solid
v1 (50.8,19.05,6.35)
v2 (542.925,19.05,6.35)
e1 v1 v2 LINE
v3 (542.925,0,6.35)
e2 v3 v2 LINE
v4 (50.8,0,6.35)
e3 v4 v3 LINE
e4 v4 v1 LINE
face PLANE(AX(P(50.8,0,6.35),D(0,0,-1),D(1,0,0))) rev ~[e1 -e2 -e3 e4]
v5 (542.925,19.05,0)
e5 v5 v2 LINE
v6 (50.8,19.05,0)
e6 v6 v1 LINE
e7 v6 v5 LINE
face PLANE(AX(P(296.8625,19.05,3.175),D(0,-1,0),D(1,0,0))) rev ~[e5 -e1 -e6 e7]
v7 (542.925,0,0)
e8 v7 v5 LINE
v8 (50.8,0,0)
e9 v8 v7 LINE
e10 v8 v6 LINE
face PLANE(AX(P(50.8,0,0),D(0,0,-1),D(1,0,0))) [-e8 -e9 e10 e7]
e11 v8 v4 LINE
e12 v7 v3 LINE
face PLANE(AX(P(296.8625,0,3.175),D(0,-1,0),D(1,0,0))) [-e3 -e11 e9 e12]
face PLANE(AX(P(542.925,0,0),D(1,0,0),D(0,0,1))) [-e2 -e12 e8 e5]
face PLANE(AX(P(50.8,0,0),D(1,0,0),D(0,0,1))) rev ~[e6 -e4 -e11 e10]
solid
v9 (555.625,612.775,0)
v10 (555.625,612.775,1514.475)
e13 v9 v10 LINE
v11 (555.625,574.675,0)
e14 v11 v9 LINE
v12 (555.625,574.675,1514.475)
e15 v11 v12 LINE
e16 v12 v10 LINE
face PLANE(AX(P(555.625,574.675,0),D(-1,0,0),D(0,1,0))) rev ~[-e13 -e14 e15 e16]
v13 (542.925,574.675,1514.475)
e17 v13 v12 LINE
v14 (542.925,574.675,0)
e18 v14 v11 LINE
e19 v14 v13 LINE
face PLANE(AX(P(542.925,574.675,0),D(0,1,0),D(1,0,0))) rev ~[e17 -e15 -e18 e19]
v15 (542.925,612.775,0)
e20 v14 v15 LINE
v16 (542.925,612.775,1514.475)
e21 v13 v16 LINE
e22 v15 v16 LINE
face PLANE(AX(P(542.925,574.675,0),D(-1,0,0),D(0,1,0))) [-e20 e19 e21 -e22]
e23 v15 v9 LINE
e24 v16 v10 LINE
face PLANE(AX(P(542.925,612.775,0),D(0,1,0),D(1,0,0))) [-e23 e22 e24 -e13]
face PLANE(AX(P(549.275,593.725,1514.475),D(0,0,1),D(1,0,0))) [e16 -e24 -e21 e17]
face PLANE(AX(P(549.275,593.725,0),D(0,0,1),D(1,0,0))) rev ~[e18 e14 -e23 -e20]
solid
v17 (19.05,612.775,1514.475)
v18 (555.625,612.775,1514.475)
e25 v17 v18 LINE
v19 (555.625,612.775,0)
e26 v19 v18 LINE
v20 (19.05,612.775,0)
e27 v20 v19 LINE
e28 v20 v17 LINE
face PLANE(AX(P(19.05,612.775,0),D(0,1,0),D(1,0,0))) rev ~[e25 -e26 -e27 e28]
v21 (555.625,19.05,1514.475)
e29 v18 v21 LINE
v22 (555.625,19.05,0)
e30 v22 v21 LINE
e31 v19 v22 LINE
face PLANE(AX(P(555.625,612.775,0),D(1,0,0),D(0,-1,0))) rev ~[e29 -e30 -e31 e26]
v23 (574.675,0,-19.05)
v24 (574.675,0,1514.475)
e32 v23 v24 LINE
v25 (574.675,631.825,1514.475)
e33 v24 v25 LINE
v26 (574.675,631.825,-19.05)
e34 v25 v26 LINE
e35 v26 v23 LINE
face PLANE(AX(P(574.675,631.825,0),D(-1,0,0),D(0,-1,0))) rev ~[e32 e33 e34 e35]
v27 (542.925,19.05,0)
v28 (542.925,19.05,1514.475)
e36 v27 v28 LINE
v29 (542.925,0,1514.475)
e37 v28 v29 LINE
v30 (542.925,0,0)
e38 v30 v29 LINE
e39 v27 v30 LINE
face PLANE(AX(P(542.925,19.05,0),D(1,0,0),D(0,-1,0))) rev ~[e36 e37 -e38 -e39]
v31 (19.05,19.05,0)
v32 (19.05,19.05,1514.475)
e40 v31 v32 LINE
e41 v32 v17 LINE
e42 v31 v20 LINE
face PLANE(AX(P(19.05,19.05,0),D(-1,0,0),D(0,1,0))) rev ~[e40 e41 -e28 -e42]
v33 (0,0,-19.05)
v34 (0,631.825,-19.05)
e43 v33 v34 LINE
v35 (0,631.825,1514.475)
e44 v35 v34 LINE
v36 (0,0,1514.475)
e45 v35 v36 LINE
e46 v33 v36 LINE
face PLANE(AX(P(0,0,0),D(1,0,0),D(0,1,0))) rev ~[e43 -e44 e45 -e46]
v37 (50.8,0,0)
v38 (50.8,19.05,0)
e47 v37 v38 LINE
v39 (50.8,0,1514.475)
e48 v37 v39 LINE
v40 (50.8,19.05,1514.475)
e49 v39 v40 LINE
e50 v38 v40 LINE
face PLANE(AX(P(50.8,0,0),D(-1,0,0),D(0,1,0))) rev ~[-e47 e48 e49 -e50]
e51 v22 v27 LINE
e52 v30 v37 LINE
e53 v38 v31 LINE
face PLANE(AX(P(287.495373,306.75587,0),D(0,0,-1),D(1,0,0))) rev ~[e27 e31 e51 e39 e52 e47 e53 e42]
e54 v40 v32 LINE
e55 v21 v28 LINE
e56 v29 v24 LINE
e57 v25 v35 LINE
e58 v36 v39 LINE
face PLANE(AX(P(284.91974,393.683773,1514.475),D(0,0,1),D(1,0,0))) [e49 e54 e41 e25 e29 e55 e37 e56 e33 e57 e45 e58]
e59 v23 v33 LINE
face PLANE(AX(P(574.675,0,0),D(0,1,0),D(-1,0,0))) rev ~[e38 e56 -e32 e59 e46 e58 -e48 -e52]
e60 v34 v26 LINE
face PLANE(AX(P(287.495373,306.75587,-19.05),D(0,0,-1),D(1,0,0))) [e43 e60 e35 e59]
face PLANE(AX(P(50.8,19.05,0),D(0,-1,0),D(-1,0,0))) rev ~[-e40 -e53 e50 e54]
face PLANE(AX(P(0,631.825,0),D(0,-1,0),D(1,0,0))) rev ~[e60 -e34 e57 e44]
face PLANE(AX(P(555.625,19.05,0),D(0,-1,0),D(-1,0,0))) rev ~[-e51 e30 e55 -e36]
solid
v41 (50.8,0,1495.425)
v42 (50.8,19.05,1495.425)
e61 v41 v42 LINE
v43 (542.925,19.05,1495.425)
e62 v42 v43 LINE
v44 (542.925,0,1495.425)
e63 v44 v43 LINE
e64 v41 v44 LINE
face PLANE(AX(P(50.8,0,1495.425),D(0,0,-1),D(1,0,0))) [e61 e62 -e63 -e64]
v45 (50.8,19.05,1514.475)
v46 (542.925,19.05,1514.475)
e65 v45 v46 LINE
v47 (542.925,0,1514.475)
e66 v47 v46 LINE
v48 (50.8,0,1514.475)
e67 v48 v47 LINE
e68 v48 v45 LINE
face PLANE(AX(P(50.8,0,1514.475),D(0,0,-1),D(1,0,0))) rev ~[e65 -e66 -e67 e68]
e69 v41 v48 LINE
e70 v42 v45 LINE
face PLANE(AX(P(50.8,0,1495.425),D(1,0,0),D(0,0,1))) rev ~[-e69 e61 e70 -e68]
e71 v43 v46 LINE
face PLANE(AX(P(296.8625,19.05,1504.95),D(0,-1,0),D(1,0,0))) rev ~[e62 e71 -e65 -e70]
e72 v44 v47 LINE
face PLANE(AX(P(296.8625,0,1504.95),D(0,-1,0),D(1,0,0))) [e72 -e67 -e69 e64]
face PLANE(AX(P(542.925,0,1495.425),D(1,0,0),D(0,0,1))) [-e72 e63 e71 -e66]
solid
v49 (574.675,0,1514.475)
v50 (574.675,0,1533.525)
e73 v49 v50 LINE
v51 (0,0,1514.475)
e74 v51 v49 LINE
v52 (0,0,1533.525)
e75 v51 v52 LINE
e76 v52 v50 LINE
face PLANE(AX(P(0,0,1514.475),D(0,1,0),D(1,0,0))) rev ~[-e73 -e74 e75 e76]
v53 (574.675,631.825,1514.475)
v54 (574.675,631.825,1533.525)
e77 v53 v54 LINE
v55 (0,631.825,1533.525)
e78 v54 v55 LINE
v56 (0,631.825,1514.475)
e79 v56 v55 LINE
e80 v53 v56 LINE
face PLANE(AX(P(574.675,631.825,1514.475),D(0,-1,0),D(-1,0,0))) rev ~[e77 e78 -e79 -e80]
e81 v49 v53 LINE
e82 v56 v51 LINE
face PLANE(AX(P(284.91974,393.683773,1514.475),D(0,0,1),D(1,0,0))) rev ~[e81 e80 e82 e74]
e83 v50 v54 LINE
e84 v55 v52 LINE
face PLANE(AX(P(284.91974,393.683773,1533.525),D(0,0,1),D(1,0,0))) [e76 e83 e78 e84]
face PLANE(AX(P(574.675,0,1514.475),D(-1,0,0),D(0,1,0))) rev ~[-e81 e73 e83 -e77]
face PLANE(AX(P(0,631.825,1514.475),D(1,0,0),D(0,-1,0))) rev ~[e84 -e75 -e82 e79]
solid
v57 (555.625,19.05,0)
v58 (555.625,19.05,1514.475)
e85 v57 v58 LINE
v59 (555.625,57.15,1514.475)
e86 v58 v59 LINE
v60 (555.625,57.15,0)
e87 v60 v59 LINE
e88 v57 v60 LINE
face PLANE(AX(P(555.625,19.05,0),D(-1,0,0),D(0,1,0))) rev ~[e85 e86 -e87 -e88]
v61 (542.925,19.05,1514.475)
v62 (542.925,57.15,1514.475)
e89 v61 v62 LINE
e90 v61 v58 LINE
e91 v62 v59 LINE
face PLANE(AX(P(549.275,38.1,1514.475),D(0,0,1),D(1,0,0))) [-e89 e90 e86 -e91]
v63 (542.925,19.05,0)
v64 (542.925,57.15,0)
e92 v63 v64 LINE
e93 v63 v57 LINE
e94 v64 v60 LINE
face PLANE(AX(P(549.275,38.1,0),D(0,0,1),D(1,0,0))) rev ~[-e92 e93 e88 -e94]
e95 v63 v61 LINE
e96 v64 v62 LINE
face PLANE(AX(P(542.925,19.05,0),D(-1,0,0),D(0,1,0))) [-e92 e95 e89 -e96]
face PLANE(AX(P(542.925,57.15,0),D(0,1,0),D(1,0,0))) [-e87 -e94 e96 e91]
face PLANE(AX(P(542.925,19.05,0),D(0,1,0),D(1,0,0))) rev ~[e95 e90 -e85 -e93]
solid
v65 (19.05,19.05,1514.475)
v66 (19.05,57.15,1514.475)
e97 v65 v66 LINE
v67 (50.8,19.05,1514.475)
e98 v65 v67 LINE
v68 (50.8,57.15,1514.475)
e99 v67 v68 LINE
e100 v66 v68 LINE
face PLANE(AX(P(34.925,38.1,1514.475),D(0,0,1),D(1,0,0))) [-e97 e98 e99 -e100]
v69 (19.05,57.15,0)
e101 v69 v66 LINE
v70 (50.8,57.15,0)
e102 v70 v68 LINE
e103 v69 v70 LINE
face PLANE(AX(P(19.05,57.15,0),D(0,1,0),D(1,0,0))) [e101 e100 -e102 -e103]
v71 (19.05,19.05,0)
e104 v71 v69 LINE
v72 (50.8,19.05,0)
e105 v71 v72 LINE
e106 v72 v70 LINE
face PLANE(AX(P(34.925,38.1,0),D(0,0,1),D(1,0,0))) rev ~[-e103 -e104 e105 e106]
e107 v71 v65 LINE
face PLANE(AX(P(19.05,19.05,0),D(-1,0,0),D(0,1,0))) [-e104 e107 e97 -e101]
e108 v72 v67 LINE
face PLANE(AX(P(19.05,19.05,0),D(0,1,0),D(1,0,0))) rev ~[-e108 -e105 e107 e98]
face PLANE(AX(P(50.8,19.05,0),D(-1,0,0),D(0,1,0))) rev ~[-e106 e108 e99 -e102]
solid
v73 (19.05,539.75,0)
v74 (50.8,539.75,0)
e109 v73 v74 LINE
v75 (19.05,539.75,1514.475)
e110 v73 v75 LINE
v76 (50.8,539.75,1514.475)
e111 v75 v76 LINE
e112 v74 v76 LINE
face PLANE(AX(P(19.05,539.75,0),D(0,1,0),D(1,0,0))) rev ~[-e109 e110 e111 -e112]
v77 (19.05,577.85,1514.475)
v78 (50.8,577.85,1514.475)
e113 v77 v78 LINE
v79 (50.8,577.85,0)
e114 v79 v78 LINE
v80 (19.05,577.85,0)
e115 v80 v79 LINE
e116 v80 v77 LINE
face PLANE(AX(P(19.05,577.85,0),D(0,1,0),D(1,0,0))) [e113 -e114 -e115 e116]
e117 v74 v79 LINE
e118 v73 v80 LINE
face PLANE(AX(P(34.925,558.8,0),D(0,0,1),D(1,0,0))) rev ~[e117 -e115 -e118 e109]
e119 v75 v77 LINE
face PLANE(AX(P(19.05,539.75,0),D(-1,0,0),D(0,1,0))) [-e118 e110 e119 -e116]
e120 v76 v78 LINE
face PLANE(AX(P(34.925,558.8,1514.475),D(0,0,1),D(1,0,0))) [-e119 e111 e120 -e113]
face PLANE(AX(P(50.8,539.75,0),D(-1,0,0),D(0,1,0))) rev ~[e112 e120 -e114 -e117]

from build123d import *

# Parameters (mm, degrees)
F1_DEPTH  = 1514.475
F3_DEPTH  = 19.05
F5_DEPTH  = 19.05
F6_W      = 492.125
F6_H      = 6.35
F7_DEPTH  = 19.05
F8_W      = 492.125
F8_H      = 19.05
F9_DEPTH  = 19.05
F10_W     = 12.7
F10_H     = 38.1
F11_DEPTH = 1514.475
F10_W_2   = 31.75


# Not quite as in the source:
# - a feature names something its author has since deleted; it is built from what else it names


with BuildPart() as f1:
    # F0 (on Top) → F1 (new body)
    with BuildSketch(Plane.XY):
        Polygon((0, 631.825), (0, 0), (50.8, 0), (50.8, 19.05), (19.05, 19.05), (19.05, 612.775), (555.625, 612.775), (555.625, 19.05), (542.925, 19.05), (542.925, 0), (574.675, 0), (574.675, 631.825), align=None)
    extrude(amount=F1_DEPTH)

    # F4 (on face) → F5 (join)
    with BuildSketch(Plane(origin=(0, 0, 0), x_dir=(1, 0, 0), z_dir=(0, 0, -1))):
        Polygon((542.925, 0), (50.8, 0), (50.8, -19.05), (19.05, -19.05), (19.05, -612.775), (555.625, -612.775), (555.625, -19.05), (542.925, -19.05), align=None)
        Polygon((50.8, 0), (0, 0), (0, -631.825), (574.675, -631.825), (574.675, 0), (542.925, 0), (542.925, -19.05), (555.625, -19.05), (555.625, -612.775), (19.05, -612.775), (19.05, -19.05), (50.8, -19.05), align=None)
    extrude(amount=F5_DEPTH)


with BuildPart() as f3:
    # F2 (on face) → F3 (new body)
    with BuildSketch(Plane.XY.offset(1514.475)):
        Polygon((574.675, 631.825), (0, 631.825), (0, 0), (50.8, 0), (50.8, 19.05), (19.05, 19.05), (19.05, 612.775), (555.625, 612.775), (555.625, 19.05), (542.925, 19.05), (542.925, 0), (574.675, 0), align=None)
        Polygon((50.8, 19.05), (50.8, 0), (542.925, 0), (542.925, 19.05), (555.625, 19.05), (555.625, 612.775), (19.05, 612.775), (19.05, 19.05), align=None)
    extrude(amount=F3_DEPTH)


with BuildPart() as f7:
    # F6 (on face) → F7 (new body)
    with BuildSketch(Plane.XZ):
        with Locations((296.8625, 3.175)):
            Rectangle(F6_W, F6_H)
    extrude(amount=-F7_DEPTH)


with BuildPart() as f9:
    # F8 (on face) → F9 (new body)
    with BuildSketch(Plane.XZ):
        with Locations((296.8625, 1504.95)):
            Rectangle(F8_W, F8_H)
    extrude(amount=-F9_DEPTH)


with BuildPart() as f11:
    # F10 (on face) → F11 (new body, through all)
    with BuildSketch(Plane.XY):
        with Locations((549.275, 593.725)):
            Rectangle(F10_W, F10_H)
    extrude(amount=F11_DEPTH)


with BuildPart() as f11b:
    # F10 (on face) → F11, piece 2 (new body, through all)
    with BuildSketch(Plane.XY):
        with Locations((549.275, 38.1)):
            Rectangle(F10_W, F10_H)
    extrude(amount=F11_DEPTH)


with BuildPart() as f11c:
    # F10 (on face) → F11, piece 3 (new body, through all)
    with BuildSketch(Plane.XY):
        with Locations((34.925, 38.1)):
            Rectangle(F10_W_2, F10_H)
    extrude(amount=F11_DEPTH)


with BuildPart() as f11d:
    # F10 (on face) → F11, piece 4 (new body, through all)
    with BuildSketch(Plane.XY):
        with Locations((34.925, 558.8)):
            Rectangle(F10_W_2, F10_H)
    extrude(amount=F11_DEPTH)


solid = Compound([f1.part, f3.part, f7.part, f9.part, f11.part, f11b.part, f11c.part, f11d.part])
